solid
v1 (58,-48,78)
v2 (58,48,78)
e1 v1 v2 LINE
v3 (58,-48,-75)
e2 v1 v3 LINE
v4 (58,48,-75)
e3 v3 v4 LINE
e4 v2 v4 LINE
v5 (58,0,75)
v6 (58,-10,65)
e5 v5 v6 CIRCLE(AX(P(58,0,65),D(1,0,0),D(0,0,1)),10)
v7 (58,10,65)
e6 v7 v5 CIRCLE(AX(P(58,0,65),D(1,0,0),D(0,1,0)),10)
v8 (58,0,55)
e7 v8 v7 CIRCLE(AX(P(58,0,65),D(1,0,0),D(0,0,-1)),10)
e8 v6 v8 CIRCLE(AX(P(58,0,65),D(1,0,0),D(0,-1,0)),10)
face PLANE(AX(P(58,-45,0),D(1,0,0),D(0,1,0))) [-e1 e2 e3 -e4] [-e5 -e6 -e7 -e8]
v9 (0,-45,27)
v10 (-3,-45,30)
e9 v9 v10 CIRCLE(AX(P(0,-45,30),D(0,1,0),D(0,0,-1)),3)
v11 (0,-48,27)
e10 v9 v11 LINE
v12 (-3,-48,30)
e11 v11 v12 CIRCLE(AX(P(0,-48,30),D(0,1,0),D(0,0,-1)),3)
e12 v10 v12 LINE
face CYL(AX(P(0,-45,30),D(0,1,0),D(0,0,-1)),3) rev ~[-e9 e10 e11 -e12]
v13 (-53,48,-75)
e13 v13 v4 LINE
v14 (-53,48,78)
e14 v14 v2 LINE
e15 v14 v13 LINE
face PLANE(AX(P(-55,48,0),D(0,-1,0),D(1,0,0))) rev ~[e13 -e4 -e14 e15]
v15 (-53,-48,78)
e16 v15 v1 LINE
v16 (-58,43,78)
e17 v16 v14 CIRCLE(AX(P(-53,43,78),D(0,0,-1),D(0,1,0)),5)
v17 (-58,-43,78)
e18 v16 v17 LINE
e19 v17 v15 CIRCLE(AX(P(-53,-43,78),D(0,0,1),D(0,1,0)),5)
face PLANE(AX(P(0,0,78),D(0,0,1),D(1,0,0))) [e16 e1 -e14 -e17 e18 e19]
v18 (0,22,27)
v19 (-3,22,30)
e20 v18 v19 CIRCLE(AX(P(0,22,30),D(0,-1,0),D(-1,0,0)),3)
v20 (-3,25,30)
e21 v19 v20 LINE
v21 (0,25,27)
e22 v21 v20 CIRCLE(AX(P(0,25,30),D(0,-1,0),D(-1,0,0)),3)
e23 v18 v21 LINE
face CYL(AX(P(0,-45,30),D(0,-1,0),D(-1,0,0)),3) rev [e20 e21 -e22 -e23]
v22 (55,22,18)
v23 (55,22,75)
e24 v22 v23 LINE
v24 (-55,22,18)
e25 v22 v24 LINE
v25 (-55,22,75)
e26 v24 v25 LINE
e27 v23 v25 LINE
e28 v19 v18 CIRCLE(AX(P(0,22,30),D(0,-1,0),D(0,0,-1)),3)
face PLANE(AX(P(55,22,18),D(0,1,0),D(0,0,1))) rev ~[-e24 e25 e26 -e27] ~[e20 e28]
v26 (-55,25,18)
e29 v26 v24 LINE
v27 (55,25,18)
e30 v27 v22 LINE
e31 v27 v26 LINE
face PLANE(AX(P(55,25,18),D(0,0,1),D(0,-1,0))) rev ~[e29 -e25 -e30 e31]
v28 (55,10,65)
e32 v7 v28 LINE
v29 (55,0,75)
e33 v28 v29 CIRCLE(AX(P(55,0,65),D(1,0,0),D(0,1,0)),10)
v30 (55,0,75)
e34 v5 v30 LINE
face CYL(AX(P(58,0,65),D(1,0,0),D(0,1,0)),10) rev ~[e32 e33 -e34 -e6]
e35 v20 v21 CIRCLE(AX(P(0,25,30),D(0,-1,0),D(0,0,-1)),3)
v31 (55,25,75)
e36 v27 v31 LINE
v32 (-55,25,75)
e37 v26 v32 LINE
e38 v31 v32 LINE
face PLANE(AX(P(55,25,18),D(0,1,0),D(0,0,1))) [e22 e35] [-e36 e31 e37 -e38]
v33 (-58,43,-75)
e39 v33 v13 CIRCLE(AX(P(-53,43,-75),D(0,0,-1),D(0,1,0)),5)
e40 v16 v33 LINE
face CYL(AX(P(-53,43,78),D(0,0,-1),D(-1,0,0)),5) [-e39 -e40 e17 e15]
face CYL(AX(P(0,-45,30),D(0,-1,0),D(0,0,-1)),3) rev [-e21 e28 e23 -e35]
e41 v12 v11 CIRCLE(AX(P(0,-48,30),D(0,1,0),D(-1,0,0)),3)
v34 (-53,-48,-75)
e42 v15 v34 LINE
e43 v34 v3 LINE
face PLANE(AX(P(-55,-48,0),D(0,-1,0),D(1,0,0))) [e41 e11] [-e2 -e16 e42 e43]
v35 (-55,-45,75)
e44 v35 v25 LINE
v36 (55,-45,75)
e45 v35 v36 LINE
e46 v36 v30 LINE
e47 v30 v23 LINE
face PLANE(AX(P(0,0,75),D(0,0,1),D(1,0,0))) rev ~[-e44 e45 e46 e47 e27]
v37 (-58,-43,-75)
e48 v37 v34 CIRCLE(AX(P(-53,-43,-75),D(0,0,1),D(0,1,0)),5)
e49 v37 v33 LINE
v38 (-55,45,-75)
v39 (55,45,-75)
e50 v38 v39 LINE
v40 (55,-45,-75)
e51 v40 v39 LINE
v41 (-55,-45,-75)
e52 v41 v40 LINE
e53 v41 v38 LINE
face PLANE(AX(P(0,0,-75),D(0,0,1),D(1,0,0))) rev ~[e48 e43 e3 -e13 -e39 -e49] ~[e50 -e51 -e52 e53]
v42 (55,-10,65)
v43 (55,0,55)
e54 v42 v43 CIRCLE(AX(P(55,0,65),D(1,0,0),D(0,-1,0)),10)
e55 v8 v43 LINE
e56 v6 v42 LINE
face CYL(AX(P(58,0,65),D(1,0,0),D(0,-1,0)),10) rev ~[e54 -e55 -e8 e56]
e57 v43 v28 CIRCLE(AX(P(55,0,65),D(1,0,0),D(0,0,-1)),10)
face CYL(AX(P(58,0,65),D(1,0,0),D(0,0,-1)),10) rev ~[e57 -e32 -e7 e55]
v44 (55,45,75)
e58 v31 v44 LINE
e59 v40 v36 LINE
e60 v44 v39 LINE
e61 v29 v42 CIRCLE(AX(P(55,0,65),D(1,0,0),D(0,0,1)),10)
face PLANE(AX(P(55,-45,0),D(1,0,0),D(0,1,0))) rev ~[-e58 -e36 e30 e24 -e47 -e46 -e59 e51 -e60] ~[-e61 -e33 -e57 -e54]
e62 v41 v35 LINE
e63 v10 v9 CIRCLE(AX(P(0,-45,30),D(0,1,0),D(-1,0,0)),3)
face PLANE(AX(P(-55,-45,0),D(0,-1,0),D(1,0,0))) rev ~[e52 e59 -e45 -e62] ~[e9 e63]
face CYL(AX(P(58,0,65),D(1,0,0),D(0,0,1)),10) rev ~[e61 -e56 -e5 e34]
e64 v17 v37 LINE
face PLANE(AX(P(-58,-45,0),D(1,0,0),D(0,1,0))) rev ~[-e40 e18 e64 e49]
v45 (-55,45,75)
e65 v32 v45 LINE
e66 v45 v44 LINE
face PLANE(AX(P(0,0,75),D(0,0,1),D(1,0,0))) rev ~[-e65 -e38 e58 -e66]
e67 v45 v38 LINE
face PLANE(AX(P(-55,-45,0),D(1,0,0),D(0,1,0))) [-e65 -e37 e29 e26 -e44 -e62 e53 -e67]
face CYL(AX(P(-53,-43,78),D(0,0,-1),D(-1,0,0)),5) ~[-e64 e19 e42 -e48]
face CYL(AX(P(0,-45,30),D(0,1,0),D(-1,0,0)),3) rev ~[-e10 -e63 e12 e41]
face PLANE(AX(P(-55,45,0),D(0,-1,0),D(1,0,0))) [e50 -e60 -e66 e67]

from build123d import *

# Parameters (mm, degrees)
F0_W          = 110
F0_H          = 90
F1_DEPTH      = 75
F2_T          = 3
F4_DEPTH      = 25.4
F5_W          = 3
F5_H          = 60
F6_DEPTH      = 110
F8_DEPTH      = 76
F8_DEPTH_BACK = 88
F9_R          = 5


with BuildPart() as f1:
    # F0 (on Top) → F1 (new body, symmetric)
    with BuildSketch(Plane.XY):
        Rectangle(F0_W, F0_H)
    extrude(amount=F1_DEPTH, both=True)

    # F2
    f2_openings = [f1.faces().sort_by_distance(p)[0] for p in [
        (0, 0, -75),
    ]]
    offset(amount=F2_T, openings=f2_openings, kind=Kind.INTERSECTION)

    # F3 (on face) → F4 (cut)
    with BuildSketch(Plane.YZ.offset(58)):
        with BuildLine():
            Line((0, 55), (0, 75))
            ThreePointArc((0, 75), (-7.0710678119, 72.0710678119), (-10, 65))
            ThreePointArc((-10, 65), (-7.0710678119, 57.9289321881), (0, 55))
        make_face()
        with BuildLine():
            ThreePointArc((10, 65), (7.0710678119, 72.0710678119), (0, 75))
            Line((0, 75), (0, 55))
            ThreePointArc((0, 55), (7.0710678119, 57.9289321881), (10, 65))
        make_face()
    extrude(amount=-F4_DEPTH, mode=Mode.SUBTRACT)

    # F5 (on face) → F6 (join)
    with BuildSketch(Plane(origin=(55, 0, 0), x_dir=(0, -1, 0), z_dir=(-1, 0, 0))):
        with Locations((-23.5, 48)):
            Rectangle(F5_W, F5_H)
    extrude(amount=F6_DEPTH)

    # F7 (on face) → F8 (cut, two sides)
    with BuildSketch(Plane(origin=(0, -45, 0), x_dir=(-1, 0, 0), z_dir=(0, 1, 0))) as f8_sk:
        with BuildLine():
            ThreePointArc((3, 30), (-2.1213203436, 32.1213203436), (0, 27))
            ThreePointArc((0, 27), (2.1213203436, 27.8786796564), (3, 30))
        make_face()
    extrude(amount=-F8_DEPTH, mode=Mode.SUBTRACT)
    extrude(f8_sk.sketch, amount=F8_DEPTH_BACK, mode=Mode.SUBTRACT)

    # F9
    f9_edges = [f1.edges().sort_by_distance(p)[0] for p in [
        (-58, 48, 1.5),
        (-58, -48, 1.5),
    ]]
    fillet(f9_edges, radius=F9_R)


solid = f1.part
